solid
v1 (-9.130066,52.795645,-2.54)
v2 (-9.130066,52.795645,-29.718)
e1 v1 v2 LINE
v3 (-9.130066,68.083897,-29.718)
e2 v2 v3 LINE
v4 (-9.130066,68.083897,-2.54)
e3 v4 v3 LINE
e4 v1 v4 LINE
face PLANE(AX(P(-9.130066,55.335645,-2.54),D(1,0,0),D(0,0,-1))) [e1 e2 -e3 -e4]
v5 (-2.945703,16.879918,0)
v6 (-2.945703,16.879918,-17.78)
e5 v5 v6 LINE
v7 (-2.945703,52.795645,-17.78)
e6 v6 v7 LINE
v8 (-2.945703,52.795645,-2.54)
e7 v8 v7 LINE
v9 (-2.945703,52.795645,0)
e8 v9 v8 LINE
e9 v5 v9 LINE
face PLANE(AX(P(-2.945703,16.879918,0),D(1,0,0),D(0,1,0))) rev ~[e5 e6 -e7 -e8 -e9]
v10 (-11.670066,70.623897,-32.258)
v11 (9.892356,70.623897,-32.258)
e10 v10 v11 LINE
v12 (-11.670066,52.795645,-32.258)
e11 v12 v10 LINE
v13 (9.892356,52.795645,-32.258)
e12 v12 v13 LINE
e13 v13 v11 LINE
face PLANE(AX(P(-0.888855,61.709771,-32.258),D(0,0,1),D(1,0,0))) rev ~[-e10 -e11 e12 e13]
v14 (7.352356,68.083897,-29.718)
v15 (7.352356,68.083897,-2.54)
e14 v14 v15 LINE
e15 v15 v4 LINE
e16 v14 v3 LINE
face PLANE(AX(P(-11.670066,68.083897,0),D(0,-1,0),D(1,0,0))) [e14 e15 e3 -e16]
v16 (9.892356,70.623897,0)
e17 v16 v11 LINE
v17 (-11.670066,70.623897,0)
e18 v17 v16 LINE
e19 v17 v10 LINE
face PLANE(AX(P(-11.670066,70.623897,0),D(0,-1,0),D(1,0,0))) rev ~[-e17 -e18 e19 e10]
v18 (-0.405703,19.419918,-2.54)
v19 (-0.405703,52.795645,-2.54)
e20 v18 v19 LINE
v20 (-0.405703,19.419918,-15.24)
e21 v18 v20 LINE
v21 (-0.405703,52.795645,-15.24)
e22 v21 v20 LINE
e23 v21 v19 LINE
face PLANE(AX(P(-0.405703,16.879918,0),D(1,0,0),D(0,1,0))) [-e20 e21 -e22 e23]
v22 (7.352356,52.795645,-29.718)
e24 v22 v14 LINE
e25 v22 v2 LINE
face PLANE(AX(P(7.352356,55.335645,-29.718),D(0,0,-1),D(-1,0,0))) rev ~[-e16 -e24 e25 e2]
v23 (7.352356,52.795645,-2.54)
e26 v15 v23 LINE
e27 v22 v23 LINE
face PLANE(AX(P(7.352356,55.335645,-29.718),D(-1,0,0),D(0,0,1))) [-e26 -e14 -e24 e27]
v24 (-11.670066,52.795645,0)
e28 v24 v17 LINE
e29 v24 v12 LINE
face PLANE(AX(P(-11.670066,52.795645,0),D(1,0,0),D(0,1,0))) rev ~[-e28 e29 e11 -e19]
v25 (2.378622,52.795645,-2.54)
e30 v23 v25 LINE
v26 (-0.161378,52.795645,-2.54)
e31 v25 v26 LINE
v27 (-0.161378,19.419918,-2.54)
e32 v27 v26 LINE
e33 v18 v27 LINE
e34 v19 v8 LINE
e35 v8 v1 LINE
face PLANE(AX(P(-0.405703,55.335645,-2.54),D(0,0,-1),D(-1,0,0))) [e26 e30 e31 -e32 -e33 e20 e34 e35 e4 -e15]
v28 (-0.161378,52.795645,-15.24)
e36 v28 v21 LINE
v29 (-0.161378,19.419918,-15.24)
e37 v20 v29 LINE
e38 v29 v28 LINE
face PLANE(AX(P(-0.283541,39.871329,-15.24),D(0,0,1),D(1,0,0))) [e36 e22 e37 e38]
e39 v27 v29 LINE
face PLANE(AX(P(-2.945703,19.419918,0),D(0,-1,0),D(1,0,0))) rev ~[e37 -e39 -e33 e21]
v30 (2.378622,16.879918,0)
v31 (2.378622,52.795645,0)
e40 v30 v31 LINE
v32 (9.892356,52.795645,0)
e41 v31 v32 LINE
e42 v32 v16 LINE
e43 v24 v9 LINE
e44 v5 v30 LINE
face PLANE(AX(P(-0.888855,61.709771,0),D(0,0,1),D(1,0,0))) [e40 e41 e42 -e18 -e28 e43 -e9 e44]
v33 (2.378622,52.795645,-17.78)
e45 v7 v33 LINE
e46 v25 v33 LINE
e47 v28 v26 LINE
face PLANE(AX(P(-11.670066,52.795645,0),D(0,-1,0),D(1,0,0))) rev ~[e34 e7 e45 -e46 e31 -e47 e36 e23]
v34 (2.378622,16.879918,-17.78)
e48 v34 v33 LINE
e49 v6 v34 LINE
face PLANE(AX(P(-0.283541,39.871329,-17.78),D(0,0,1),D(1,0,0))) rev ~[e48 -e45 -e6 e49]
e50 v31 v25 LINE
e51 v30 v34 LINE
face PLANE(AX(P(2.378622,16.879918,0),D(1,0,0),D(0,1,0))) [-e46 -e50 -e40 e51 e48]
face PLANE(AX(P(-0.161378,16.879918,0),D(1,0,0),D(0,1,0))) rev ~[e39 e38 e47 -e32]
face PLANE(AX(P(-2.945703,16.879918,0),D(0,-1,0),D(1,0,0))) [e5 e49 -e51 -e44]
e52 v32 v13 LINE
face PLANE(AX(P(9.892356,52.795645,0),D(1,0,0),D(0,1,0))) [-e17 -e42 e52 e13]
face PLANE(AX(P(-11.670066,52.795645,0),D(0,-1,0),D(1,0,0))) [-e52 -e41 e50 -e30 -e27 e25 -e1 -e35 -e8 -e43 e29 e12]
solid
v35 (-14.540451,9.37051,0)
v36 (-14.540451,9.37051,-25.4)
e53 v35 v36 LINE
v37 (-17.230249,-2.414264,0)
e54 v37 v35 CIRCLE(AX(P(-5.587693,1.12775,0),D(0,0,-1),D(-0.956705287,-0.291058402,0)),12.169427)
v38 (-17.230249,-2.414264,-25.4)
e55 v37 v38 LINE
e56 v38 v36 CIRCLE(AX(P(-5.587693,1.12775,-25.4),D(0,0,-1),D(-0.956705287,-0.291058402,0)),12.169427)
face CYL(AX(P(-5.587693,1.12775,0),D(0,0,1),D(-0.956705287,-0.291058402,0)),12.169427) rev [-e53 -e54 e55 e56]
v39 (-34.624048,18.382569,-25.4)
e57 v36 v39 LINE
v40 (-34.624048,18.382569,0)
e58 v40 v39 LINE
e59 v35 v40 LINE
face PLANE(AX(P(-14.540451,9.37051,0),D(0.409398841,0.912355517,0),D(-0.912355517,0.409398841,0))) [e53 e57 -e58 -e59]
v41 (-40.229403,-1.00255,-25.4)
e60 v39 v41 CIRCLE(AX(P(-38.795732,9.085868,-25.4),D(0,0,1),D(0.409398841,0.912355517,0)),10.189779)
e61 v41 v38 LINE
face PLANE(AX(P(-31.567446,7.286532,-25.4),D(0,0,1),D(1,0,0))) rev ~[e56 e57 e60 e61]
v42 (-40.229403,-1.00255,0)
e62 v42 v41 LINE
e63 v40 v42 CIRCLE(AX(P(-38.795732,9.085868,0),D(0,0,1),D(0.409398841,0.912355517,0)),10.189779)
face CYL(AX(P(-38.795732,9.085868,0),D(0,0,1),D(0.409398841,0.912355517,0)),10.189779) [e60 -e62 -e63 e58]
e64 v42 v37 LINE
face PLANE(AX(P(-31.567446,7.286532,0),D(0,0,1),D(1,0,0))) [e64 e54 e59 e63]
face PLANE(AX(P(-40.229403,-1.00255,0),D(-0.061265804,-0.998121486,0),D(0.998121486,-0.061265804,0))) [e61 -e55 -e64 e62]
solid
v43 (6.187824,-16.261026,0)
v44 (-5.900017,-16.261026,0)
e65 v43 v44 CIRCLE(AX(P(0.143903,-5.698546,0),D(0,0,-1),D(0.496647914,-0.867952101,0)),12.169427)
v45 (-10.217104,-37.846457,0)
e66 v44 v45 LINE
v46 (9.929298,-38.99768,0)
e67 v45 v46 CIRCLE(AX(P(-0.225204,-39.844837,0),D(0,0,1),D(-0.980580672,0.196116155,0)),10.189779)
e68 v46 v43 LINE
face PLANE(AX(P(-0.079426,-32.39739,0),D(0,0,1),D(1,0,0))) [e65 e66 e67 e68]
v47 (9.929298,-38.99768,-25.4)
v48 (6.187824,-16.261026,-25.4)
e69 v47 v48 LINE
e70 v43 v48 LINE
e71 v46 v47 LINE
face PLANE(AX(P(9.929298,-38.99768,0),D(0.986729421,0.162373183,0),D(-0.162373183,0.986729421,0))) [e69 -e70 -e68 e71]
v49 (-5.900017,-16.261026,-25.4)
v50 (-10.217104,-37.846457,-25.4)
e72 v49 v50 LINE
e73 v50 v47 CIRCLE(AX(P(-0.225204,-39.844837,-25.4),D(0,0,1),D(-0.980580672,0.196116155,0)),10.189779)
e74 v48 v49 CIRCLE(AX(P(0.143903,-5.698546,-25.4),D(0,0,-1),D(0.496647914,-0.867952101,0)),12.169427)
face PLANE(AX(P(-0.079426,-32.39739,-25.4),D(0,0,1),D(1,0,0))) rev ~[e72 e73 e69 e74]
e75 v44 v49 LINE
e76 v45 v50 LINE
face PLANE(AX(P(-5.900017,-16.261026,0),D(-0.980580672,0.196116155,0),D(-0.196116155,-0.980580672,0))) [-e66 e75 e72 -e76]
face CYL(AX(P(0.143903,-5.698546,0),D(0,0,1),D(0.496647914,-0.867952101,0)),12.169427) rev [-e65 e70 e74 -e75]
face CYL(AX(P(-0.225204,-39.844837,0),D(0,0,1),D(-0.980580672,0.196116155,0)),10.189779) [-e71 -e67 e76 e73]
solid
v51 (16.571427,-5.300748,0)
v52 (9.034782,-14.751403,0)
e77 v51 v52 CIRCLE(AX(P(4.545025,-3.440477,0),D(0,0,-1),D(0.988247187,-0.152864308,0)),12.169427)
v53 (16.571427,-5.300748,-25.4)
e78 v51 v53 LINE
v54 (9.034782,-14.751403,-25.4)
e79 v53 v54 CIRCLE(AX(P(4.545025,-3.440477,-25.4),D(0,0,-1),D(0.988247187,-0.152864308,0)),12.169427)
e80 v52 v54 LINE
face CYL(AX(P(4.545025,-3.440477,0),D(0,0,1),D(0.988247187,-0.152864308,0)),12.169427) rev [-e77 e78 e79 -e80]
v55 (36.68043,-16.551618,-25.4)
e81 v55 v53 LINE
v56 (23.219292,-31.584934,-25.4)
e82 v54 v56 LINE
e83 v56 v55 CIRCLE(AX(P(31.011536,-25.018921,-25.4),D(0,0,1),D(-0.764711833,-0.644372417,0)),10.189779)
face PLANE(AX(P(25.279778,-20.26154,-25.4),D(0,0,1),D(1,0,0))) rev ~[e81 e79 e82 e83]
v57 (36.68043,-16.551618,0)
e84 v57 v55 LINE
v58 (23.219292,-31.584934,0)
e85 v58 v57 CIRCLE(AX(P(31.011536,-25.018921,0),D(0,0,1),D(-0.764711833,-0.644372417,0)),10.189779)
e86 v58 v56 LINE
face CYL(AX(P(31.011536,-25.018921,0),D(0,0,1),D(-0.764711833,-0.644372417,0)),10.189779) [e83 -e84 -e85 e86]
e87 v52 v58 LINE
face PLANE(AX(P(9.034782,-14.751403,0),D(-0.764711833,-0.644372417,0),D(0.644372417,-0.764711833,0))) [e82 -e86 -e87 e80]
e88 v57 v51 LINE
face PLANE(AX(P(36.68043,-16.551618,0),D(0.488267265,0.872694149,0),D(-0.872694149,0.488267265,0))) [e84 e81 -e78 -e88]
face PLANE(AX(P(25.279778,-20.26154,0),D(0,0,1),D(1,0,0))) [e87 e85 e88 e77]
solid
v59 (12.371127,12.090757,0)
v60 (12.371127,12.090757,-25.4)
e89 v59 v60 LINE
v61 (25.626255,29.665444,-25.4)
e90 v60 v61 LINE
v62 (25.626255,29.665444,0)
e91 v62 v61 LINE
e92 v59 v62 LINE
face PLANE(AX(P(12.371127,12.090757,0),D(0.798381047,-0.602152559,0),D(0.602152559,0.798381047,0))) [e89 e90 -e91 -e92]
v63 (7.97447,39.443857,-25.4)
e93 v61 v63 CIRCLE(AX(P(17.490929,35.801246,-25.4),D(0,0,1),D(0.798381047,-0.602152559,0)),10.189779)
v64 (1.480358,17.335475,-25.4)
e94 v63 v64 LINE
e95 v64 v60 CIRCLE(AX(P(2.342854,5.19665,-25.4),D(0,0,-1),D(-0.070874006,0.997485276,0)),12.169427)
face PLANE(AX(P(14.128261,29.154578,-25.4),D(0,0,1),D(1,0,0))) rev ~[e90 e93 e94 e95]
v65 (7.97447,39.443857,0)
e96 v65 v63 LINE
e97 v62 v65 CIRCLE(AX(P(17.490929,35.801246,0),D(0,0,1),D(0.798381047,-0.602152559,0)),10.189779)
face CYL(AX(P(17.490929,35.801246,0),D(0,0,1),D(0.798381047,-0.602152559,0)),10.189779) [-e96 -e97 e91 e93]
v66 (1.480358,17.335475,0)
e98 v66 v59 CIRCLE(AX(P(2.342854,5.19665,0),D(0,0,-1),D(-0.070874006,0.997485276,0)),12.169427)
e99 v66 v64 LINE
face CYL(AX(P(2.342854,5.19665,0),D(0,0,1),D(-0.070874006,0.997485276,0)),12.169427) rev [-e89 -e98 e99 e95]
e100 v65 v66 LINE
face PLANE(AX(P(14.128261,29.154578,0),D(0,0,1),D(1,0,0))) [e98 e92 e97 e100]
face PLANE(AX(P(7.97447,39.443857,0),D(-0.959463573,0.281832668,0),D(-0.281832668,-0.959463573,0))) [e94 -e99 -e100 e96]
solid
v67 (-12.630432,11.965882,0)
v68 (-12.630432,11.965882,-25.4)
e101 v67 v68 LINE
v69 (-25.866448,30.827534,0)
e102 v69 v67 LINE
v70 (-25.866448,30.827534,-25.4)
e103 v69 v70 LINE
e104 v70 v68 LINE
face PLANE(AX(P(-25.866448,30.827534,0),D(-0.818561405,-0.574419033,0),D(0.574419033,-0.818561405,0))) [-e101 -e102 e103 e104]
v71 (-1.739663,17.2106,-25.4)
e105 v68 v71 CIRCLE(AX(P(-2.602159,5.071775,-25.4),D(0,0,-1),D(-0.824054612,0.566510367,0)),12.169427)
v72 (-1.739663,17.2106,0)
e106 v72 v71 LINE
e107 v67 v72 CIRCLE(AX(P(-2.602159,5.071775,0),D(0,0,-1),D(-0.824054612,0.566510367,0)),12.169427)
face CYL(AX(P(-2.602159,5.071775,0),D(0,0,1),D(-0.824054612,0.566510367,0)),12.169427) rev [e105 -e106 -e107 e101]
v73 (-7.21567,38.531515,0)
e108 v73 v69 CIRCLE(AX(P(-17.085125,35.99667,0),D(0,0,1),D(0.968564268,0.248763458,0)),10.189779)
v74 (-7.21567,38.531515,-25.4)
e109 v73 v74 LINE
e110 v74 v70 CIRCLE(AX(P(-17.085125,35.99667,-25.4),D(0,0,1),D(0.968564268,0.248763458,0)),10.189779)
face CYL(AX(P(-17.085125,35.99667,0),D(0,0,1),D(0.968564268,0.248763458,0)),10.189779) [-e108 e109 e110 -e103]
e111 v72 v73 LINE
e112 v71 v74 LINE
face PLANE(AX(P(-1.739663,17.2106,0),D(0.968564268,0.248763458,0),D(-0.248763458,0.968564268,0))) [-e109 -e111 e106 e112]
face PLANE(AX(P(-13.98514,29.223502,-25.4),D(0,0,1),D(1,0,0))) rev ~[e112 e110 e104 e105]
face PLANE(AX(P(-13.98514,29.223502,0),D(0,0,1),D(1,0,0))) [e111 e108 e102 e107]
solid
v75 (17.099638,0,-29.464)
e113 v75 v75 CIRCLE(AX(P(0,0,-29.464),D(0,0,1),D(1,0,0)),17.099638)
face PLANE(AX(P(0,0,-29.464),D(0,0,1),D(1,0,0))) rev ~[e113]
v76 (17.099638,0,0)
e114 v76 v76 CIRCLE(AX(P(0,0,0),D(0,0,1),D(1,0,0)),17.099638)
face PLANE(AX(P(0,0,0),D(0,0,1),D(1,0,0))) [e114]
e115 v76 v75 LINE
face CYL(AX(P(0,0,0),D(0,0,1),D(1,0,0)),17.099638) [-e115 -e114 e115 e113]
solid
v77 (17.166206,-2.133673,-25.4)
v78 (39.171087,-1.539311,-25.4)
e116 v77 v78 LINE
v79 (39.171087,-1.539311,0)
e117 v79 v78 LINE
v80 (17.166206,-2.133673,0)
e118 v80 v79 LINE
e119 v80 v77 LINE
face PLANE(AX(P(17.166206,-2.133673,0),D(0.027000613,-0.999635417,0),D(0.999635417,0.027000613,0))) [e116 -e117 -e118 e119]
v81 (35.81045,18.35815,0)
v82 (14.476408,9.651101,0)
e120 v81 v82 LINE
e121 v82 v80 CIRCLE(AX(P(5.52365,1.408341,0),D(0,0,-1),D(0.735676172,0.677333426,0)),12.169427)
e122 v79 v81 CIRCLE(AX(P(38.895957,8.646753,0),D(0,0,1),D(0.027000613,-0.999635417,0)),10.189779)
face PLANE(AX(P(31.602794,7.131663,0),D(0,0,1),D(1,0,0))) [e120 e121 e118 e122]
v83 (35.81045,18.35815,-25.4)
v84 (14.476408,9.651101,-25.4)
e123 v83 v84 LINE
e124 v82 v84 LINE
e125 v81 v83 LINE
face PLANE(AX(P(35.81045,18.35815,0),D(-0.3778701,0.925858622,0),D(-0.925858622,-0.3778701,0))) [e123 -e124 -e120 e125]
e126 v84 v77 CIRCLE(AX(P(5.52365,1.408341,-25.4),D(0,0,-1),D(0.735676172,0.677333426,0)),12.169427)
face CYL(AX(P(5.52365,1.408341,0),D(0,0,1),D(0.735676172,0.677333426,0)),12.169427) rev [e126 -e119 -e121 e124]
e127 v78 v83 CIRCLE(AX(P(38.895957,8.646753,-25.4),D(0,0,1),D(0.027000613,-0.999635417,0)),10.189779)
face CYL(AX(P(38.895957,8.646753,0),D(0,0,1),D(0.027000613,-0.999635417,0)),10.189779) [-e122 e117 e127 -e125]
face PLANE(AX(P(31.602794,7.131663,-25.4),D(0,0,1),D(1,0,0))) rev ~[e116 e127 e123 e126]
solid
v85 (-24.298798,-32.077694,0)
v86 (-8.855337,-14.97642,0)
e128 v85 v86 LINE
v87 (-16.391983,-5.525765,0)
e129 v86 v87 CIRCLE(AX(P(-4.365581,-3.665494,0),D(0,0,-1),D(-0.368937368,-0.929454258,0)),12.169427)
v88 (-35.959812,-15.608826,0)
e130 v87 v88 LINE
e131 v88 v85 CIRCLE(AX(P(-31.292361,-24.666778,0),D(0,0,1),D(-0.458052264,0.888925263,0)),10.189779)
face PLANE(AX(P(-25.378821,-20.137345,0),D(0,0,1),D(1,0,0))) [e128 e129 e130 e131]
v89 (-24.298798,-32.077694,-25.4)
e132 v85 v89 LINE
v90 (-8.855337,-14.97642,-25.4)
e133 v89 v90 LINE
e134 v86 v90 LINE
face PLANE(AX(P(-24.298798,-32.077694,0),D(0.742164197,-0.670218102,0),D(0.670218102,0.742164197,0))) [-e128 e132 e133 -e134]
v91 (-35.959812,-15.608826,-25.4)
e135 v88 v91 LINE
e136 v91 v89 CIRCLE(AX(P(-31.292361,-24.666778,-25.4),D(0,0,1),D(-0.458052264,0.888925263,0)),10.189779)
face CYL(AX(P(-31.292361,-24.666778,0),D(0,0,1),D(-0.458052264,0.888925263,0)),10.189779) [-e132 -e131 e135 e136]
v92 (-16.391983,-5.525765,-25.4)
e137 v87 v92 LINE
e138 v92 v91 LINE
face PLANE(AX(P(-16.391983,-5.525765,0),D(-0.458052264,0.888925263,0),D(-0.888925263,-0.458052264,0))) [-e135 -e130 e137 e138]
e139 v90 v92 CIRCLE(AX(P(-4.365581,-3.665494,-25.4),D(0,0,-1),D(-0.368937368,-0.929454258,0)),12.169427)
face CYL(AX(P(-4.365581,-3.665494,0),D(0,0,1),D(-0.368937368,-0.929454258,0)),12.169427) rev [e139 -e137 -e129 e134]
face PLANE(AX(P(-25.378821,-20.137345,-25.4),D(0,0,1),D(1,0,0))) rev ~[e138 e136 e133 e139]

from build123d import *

# Parameters (mm, degrees)
F2_DEPTH = 25.4
F0_R     = 17.0996377698
F3_DEPTH = 29.464
F4_W     = 5.3243252914
F4_H     = 45.9828209132
F5_DEPTH = 17.78
F6_W     = 21.5624216944
F6_H     = 17.8282521665
F7_DEPTH = 32.258
F8_T     = -2.54


# Not quite as in the source:
# - a shell that OpenCascade refuses in one call is made with other operations: the cavity is built on its own and cut out


with BuildPart() as f2:
    # F1 (on Top) → F2 (new body)
    with BuildSketch(Plane.XY):
        with BuildLine():
            ThreePointArc((6.1878240667, -16.2610262632), (0.1439033076, -17.8679735925), (-5.9000174515, -16.2610262632))
            Line((-5.9000174515, -16.2610262632), (-10.2171041071, -37.8464572132))
            ThreePointArc((-10.2171041071, -37.8464572132), (-0.8065285186, -50.0180206018), (9.9292984232, -38.9976799488))
            Line((9.9292984232, -38.9976799488), (6.1878240667, -16.2610262632))
        make_face()
    extrude(amount=-F2_DEPTH)


with BuildPart() as f2b:
    # F1 (on Top) → F2, piece 2 (new body)
    with BuildSketch(Plane.XY):
        with BuildLine():
            ThreePointArc((16.5714274711, -5.3007483795), (14.0594665273, -11.0279911785), (9.034781558, -14.7514034336))
            Line((9.034781558, -14.7514034336), (23.2192915338, -31.5849337595))
            ThreePointArc((23.2192915338, -31.5849337595), (38.602800891, -31.8162951417), (36.6804302337, -16.5516176381))
            Line((36.6804302337, -16.5516176381), (16.5714274711, -5.3007483795))
        make_face()
    extrude(amount=-F2_DEPTH)


with BuildPart() as f2c:
    # F1 (on Top) → F2, piece 3 (new body)
    with BuildSketch(Plane.XY):
        with BuildLine():
            ThreePointArc((14.4764079943, 9.6511011495), (17.387964691, 4.116293523), (17.1662057784, -2.1336729446))
            Line((17.1662057784, -2.1336729446), (39.1710870626, -1.5393109697))
            ThreePointArc((39.1710870626, -1.5393109697), (48.9434338759, 10.3437494942), (35.8104499338, 18.3581503455))
            Line((35.8104499338, 18.3581503455), (14.4764079943, 9.6511011495))
        make_face()
    extrude(amount=-F2_DEPTH)


with BuildPart() as f2d:
    # F1 (on Top) → F2, piece 4 (new body)
    with BuildSketch(Plane.XY):
        with BuildLine():
            ThreePointArc((1.4803580328, 17.3354746664), (7.6229707926, 16.1609252445), (12.3711269209, 12.0907567906))
            Line((12.3711269209, 12.0907567906), (25.6262550887, 29.6654443765))
            ThreePointArc((25.6262550887, 29.6654443765), (22.4286628882, 44.7147397869), (7.9744704337, 39.443856681))
            Line((7.9744704337, 39.443856681), (1.4803580328, 17.3354746664))
        make_face()
    extrude(amount=-F2_DEPTH)


with BuildPart() as f2e:
    # F1 (on Top) → F2, piece 5 (new body)
    with BuildSketch(Plane.XY):
        with BuildLine():
            ThreePointArc((-12.6304317212, 11.9658821802), (-7.8822755929, 16.0360506342), (-1.7396628331, 17.210600056))
            Line((-1.7396628331, 17.210600056), (-7.2156696473, 38.5315150424))
            ThreePointArc((-7.2156696473, 38.5315150424), (-20.9753487157, 45.4146190056), (-25.8664479525, 30.8275344276))
            Line((-25.8664479525, 30.8275344276), (-12.6304317212, 11.9658821802))
        make_face()
    extrude(amount=-F2_DEPTH)


with BuildPart() as f2f:
    # F1 (on Top) → F2, piece 6 (new body)
    with BuildSketch(Plane.XY):
        with BuildLine():
            ThreePointArc((-17.2302487752, -2.4142636471), (-17.4520076879, 3.8357028205), (-14.5404509911, 9.370510447))
            Line((-14.5404509911, 9.370510447), (-34.6240479661, 18.3825689817))
            ThreePointArc((-34.6240479661, 18.3825689817), (-48.5844949175, 11.9163638237), (-40.2294034511, -1.0025500169))
            Line((-40.2294034511, -1.0025500169), (-17.2302487752, -2.4142636471))
        make_face()
    extrude(amount=-F2_DEPTH)


with BuildPart() as f2g:
    # F1 (on Top) → F2, piece 7 (new body)
    with BuildSketch(Plane.XY):
        with BuildLine():
            ThreePointArc((-8.8553370685, -14.9764197062), (-13.8800220378, -11.2530074511), (-16.3919829816, -5.5257646522))
            Line((-16.3919829816, -5.5257646522), (-35.9598119645, -15.6088264583))
            ThreePointArc((-35.9598119645, -15.6088264583), (-39.6085255034, -30.555156367), (-24.2987976207, -32.0776938503))
            Line((-24.2987976207, -32.0776938503), (-8.8553370685, -14.9764197062))
        make_face()
    extrude(amount=-F2_DEPTH)


with BuildPart() as f3:
    # F0 (on Top) → F3 (new body)
    with BuildSketch(Plane.XY):
        Circle(F0_R)
    extrude(amount=-F3_DEPTH)


with BuildPart() as f5:
    # F4 (on Top) → F5 (new body)
    with BuildSketch(Plane.XY):
        with Locations((-0.2835408086, 39.8713285103)):
            Rectangle(F4_W, F4_H)
    extrude(amount=-F5_DEPTH)

    # F6 (on Top) → F7 (join)
    with BuildSketch(Plane.XY):
        with Locations((-0.8888551965, 61.7097709328)):
            Rectangle(F6_W, F6_H)
    extrude(amount=-F7_DEPTH)

    # F8: a shell. OpenCascade refuses it in one call, so the cavity is built on its own and cut out:
    # the body offset inwards by the wall thickness, plus a prism from it out through each open face.
    f8_core = offset(f5.part, amount=F8_T, kind=Kind.INTERSECTION, mode=Mode.PRIVATE)
    f8_exits = [f8_core.faces().sort_by_distance(p)[0] for p in [
        (-0.893077, 55.335645, -16.179493),
    ]]
    add(f8_core, mode=Mode.SUBTRACT)
    extrude(f8_exits, amount=-F8_T, mode=Mode.SUBTRACT)


solid = Compound([f2.part, f2b.part, f2c.part, f2d.part, f2e.part, f2f.part, f2g.part, f3.part, f5.part])
